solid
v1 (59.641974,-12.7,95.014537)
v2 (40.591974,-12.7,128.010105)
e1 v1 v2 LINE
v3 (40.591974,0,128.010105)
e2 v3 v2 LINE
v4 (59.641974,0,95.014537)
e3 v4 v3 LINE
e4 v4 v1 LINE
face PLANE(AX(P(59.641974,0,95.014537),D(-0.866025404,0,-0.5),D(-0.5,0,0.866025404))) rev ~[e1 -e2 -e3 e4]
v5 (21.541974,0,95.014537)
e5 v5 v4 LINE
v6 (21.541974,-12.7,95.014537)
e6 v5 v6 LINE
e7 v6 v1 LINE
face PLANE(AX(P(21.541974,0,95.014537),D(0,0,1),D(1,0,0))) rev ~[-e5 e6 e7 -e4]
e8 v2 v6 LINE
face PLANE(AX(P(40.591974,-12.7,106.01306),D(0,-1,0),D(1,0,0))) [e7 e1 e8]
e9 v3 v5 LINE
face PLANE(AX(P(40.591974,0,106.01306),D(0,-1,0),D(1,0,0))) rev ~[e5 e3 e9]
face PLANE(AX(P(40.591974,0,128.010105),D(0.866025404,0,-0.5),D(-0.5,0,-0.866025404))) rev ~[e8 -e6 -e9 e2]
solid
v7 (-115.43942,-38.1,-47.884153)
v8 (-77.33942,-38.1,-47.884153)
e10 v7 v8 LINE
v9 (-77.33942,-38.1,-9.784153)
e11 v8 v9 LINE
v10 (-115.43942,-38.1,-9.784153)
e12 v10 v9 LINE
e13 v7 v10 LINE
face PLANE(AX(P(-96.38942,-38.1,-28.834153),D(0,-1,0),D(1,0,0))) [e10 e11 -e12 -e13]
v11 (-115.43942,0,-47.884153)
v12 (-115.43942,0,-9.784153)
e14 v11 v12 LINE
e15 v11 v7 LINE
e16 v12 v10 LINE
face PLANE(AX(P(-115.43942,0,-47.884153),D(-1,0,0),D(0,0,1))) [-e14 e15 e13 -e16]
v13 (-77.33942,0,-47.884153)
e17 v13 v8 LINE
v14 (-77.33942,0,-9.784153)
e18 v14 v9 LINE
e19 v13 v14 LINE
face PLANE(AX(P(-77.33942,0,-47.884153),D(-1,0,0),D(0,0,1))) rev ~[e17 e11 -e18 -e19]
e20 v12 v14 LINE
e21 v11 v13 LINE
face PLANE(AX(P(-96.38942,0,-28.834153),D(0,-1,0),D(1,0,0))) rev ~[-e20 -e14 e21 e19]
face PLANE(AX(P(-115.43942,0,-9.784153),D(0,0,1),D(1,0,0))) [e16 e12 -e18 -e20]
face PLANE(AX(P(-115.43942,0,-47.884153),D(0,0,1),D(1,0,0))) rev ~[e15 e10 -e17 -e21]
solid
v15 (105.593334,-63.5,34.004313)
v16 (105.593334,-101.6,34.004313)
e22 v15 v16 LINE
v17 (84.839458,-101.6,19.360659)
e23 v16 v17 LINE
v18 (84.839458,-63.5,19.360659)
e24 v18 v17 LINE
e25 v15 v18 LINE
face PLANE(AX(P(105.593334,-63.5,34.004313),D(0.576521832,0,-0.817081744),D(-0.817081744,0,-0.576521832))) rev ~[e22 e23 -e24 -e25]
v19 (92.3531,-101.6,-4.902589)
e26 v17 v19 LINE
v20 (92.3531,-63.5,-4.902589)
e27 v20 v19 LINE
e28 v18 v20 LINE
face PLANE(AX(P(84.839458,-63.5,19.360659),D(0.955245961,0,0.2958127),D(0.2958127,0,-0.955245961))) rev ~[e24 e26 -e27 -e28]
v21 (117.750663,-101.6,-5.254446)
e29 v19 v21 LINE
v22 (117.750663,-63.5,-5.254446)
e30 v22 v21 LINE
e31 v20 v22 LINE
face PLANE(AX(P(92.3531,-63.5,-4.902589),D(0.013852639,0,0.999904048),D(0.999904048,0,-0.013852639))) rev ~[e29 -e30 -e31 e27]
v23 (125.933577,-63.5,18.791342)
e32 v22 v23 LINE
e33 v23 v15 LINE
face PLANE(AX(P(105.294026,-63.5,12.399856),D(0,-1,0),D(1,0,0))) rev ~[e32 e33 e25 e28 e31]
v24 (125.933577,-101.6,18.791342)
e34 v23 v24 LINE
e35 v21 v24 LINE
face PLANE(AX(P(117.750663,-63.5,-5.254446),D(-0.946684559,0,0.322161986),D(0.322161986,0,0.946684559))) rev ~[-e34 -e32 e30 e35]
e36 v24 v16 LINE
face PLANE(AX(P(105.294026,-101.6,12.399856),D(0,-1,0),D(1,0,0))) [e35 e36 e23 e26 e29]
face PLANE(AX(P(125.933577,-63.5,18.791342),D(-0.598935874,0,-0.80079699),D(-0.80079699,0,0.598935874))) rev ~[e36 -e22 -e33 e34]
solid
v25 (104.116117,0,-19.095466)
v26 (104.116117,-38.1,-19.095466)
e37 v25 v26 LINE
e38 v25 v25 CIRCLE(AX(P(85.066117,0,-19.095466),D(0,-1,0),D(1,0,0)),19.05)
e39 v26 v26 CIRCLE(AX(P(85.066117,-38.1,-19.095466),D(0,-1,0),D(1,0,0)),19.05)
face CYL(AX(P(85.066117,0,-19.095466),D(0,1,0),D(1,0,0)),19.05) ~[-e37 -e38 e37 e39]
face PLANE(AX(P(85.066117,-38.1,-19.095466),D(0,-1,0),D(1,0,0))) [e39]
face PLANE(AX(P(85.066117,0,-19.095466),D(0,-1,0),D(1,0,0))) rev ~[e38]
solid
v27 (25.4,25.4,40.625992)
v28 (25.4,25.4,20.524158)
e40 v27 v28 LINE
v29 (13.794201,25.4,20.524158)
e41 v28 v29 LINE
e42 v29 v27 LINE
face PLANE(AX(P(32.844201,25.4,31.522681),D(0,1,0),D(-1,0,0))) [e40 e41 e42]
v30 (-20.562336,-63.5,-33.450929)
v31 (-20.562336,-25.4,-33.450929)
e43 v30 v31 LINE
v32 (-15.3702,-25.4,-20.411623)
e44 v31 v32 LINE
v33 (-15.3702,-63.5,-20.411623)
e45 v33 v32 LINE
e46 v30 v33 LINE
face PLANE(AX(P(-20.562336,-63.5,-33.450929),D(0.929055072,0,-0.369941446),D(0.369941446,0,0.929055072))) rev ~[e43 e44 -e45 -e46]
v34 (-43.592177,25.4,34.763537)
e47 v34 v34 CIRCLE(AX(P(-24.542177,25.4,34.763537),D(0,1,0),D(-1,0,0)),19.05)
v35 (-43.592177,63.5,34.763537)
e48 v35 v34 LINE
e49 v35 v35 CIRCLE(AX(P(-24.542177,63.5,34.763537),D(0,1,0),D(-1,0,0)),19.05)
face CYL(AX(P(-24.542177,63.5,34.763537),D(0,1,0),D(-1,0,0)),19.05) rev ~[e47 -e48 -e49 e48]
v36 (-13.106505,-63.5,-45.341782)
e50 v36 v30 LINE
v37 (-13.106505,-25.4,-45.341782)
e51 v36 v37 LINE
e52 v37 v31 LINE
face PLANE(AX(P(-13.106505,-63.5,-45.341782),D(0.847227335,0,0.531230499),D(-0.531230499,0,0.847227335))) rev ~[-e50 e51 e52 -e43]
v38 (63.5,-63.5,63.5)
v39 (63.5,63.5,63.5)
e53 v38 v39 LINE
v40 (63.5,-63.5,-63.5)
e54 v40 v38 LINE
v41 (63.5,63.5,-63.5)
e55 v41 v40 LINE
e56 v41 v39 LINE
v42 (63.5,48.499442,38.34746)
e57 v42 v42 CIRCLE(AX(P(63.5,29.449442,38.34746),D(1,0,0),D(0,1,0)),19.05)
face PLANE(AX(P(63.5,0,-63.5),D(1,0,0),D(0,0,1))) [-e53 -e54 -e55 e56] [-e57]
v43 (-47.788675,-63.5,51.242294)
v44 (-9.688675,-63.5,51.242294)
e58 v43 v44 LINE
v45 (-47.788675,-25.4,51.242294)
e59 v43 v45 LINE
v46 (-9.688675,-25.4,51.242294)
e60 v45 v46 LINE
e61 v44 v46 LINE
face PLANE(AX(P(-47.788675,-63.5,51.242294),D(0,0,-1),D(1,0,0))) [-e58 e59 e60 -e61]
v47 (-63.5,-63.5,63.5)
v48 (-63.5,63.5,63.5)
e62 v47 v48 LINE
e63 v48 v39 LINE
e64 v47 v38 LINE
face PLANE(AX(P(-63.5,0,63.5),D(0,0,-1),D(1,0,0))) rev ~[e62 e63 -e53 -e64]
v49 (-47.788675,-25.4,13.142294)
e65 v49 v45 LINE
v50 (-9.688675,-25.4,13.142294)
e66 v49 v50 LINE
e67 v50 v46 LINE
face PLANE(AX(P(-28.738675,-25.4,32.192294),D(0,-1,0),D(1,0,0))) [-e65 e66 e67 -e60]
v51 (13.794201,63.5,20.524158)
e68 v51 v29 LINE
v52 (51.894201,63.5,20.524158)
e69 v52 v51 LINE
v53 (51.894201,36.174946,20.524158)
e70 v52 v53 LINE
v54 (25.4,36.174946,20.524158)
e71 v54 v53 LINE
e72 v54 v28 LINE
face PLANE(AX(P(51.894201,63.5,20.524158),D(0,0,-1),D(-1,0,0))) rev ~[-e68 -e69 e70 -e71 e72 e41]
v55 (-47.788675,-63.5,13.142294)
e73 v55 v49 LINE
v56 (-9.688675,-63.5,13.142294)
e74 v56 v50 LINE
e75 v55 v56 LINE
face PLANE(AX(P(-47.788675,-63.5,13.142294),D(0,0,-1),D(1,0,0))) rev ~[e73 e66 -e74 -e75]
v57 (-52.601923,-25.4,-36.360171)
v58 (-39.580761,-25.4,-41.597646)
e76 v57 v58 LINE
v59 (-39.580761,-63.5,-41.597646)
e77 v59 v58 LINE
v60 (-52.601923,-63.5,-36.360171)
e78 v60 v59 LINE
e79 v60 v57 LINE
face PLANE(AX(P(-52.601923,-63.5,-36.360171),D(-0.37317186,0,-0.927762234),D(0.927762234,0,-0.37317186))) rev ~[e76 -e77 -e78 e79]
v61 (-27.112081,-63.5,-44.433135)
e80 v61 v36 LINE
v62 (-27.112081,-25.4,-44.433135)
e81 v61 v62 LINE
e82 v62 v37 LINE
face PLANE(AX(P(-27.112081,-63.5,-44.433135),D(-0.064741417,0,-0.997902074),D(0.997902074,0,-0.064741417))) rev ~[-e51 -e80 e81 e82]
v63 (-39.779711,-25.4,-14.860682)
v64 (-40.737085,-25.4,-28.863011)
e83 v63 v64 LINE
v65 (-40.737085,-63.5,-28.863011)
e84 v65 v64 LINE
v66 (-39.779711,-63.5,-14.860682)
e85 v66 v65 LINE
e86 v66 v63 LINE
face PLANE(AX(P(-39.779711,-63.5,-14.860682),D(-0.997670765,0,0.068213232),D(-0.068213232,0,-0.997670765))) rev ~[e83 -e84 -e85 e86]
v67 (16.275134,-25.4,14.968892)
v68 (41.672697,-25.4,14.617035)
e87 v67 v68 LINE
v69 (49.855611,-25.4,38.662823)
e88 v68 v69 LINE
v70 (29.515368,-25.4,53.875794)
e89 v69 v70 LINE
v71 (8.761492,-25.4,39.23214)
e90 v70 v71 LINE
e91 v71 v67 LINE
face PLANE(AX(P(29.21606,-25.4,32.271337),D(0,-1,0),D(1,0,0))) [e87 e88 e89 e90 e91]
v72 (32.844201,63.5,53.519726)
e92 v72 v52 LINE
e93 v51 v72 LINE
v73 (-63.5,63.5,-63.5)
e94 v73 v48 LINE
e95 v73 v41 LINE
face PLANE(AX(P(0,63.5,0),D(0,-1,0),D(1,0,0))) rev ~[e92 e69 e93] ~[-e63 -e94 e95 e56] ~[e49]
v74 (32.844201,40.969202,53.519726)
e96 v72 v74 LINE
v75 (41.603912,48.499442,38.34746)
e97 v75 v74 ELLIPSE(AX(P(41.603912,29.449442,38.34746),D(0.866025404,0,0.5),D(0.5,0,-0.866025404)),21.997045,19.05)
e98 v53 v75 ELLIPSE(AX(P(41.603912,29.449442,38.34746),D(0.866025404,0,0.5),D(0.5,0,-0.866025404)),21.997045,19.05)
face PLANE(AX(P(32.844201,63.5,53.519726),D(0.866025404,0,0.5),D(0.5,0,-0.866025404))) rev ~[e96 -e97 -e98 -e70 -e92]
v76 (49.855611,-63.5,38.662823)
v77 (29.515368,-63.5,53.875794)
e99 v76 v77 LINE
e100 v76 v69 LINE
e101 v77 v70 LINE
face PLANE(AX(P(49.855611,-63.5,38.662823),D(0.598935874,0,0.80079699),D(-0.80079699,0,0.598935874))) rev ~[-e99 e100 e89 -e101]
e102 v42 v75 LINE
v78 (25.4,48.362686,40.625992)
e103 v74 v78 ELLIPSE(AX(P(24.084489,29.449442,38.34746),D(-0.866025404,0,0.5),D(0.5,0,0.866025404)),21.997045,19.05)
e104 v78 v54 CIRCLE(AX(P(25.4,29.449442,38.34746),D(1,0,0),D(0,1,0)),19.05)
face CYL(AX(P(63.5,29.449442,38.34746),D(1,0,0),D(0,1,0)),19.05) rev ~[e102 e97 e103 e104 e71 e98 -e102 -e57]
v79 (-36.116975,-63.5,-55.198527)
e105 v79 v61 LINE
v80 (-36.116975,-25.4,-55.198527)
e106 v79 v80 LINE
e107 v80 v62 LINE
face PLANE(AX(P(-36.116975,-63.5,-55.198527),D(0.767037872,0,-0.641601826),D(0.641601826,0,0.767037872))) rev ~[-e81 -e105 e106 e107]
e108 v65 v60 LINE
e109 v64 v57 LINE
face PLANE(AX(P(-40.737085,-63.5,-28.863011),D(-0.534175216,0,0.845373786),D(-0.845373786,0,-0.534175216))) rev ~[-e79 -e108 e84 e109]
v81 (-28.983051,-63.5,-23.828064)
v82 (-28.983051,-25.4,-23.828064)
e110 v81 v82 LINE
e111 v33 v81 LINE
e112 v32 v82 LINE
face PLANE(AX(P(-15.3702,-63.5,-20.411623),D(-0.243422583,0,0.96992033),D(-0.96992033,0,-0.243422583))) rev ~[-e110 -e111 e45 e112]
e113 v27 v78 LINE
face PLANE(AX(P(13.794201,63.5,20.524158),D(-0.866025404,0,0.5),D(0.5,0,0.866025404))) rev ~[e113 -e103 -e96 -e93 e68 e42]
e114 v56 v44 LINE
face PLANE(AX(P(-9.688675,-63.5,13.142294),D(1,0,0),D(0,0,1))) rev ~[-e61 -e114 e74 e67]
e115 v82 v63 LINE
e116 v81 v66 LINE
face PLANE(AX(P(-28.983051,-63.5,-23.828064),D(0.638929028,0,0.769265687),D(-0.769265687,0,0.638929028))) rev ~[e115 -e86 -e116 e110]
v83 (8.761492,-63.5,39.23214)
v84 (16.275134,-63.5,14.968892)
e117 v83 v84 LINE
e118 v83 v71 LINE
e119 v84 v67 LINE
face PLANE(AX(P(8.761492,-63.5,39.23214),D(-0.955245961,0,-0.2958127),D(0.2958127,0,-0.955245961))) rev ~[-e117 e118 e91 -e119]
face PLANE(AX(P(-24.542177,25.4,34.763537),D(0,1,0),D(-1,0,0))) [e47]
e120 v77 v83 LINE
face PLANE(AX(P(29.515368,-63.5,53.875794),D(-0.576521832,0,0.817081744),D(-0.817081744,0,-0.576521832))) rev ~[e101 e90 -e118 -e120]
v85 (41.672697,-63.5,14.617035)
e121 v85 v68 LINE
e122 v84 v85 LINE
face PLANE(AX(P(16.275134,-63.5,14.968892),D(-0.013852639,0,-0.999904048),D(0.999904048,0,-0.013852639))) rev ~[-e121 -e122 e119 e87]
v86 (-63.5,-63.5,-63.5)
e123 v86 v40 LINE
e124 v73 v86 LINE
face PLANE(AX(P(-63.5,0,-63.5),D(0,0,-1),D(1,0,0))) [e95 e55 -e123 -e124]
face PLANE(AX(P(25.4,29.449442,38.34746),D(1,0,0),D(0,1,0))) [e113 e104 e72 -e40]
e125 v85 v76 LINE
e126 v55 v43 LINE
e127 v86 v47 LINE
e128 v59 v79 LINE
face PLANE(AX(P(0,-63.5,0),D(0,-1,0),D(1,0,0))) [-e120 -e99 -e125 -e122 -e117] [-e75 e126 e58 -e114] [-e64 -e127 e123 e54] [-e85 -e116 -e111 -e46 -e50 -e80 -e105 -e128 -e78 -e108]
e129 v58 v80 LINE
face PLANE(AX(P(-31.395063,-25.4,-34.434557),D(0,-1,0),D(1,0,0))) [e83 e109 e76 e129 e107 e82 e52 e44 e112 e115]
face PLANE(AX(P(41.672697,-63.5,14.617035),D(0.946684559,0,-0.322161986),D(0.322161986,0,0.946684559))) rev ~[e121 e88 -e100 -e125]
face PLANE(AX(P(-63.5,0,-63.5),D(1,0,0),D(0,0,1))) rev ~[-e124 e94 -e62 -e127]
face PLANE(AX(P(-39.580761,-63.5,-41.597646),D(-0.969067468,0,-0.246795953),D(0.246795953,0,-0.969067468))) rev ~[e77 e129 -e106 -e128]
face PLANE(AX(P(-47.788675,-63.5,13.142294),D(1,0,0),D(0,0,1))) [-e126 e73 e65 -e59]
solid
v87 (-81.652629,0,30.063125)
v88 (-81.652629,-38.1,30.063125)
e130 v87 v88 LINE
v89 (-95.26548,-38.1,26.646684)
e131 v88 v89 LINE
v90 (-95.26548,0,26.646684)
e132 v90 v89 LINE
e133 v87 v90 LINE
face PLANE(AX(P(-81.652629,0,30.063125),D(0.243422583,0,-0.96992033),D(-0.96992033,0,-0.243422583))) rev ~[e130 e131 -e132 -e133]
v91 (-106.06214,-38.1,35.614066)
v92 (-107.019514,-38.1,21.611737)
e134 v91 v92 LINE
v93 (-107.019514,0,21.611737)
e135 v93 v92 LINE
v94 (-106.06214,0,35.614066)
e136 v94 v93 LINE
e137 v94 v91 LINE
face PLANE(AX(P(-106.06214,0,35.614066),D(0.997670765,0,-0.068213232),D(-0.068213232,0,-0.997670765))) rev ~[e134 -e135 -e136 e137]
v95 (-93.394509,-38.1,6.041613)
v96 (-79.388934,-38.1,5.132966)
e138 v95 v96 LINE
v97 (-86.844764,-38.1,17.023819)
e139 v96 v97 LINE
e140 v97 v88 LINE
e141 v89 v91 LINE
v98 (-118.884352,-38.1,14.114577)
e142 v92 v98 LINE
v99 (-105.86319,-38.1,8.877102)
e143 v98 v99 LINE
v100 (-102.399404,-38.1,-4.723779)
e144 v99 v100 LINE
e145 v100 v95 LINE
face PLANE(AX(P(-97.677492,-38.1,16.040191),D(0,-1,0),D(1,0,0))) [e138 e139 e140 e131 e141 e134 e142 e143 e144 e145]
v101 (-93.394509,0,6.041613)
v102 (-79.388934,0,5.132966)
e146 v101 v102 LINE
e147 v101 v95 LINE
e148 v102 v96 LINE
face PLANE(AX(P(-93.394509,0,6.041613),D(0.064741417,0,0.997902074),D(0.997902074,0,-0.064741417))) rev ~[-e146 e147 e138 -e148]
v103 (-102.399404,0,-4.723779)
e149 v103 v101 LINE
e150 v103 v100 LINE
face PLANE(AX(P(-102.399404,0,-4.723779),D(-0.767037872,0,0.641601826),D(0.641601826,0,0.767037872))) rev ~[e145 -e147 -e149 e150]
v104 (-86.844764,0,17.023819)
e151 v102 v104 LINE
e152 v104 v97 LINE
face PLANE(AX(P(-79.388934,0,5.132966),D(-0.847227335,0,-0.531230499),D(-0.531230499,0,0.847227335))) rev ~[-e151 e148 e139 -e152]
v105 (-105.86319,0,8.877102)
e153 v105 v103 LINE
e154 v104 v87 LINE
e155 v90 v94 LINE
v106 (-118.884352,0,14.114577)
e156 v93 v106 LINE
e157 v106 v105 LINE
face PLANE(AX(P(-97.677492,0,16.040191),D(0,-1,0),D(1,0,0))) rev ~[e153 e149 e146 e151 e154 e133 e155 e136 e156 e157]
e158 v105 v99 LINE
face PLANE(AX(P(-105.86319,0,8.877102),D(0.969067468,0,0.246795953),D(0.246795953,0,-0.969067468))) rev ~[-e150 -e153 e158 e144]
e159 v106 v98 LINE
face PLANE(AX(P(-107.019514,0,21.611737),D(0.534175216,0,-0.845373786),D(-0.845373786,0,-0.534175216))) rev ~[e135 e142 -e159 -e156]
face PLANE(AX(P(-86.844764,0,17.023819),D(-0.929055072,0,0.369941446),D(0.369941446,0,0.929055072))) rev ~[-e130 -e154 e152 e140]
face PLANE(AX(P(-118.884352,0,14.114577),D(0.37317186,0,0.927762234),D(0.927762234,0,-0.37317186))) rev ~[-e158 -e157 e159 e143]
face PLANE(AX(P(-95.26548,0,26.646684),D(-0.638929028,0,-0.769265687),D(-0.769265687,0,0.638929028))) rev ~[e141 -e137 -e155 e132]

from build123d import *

# Parameters (mm, degrees)
F0_W      = 127
F0_H      = 127
F1_DEPTH  = 63.5
F2_W      = 38.1
F2_H      = 38.1
F3_DEPTH  = 38.1
F5_DEPTH  = 38.1
F7_DEPTH  = 38.1
F8_R      = 19.05
F9_DEPTH  = 38.1
F11_DEPTH = 38.1
F12_R     = 19.05
F13_DEPTH = 38.1
F15_DEPTH = 38.1
F16_W     = 38.1
F16_H     = 38.1
F17_DEPTH = 38.1
F18_R     = 19.05
F19_DEPTH = 38.1
F21_DEPTH = 38.1
F24_DEPTH = 12.7


# Not quite as in the source:
# - the program builds the solid bodies; features that only make, move or delete a surface that nothing else refers to are left out


with BuildPart() as f1:
    # F0 (on Front) → F1 (new body, symmetric)
    with BuildSketch(Plane.XZ):
        Rectangle(F0_W, F0_H)
    extrude(amount=F1_DEPTH, both=True)

    # F2 (on face) → F3 (cut)
    with BuildSketch(Plane.XZ.offset(63.5)):
        with Locations((-28.7386754062, 32.1922943337)):
            Rectangle(F2_W, F2_H)
        with Locations((86.2550362945, -6.9399550557)):
            Rectangle(F2_W, F2_H)
    extrude(amount=-F3_DEPTH, mode=Mode.SUBTRACT)

    # F4 (on face) → F5 (cut)
    with BuildSketch(Plane.XZ.offset(63.5)):
        Polygon((8.7614915837, 39.2321395601), (16.2751341757, 14.9688921476), (41.6726969844, 14.6170351066), (49.8556114396, 38.6628229086), (29.5153678912, 53.8757940975), align=None)
    extrude(amount=-F5_DEPTH, mode=Mode.SUBTRACT)

    # F6 (on face) → F7 (cut)
    with BuildSketch(Plane(origin=(0, 63.5, 0), x_dir=(-1, 0, 0), z_dir=(0, 1, 0))):
        Polygon((-51.8942007303, 20.5241581157), (-13.7942007303, 20.5241581157), (-32.8442007303, 53.5197259999), align=None)
    extrude(amount=-F7_DEPTH, mode=Mode.SUBTRACT)

    # F8 (on face) → F9 (cut)
    with BuildSketch(Plane(origin=(0, 63.5, 0), x_dir=(-1, 0, 0), z_dir=(0, 1, 0))):
        with Locations((24.542177096, 34.7635373473)):
            Circle(F8_R)
    extrude(amount=-F9_DEPTH, mode=Mode.SUBTRACT)

    # F10 (on face) → F11 (cut)
    with BuildSketch(Plane.XZ.offset(63.5)):
        Polygon((-39.7797108135, -14.8606818497), (-40.7370848933, -28.8630111208), (-52.6019230047, -36.3601710319), (-39.5807613688, -41.5976455947), (-36.1169751935, -55.1985270174), (-27.1120806497, -44.4331350413), (-13.1065049523, -45.3417821264), (-20.5623356949, -33.4509294202), (-15.3702000572, -20.4116227799), (-28.9830514143, -23.8280636283), align=None)
    extrude(amount=-F11_DEPTH, mode=Mode.SUBTRACT)

    # F12 (on face) → F13 (cut)
    with BuildSketch(Plane.YZ.offset(63.5)):
        with Locations((29.4494424015, 38.3474603295)):
            Circle(F12_R)
    extrude(amount=-F13_DEPTH, mode=Mode.SUBTRACT)


with BuildPart() as f15:
    # F14 (on face) → F15 (new body)
    with BuildSketch(Plane.XZ.offset(63.5)):
        Polygon((84.8394576032, 19.3606587971), (92.3531001952, -4.9025886154), (117.7506630039, -5.2544456563), (125.9335774591, 18.7913421457), (105.5933339107, 34.0043133345), align=None)
    extrude(amount=F15_DEPTH)


with BuildPart() as f17:
    # F16 (on Front) → F17 (new body)
    with BuildSketch(Plane.XZ):
        with Locations((-96.3894203305, -28.8341529667)):
            Rectangle(F16_W, F16_H)
    extrude(amount=F17_DEPTH)


with BuildPart() as f19:
    # F18 (on Front) → F19 (new body)
    with BuildSketch(Plane.XZ):
        with Locations((85.0661173463, -19.0954655409)):
            Circle(F18_R)
    extrude(amount=F19_DEPTH)


with BuildPart() as f21:
    # F20 (on Front) → F21 (new body)
    with BuildSketch(Plane.XZ):
        Polygon((-106.0621396145, 35.6140661657), (-107.0195136944, 21.6117368946), (-118.8843518057, 14.1145769835), (-105.8631901699, 8.8771024207), (-102.3994039946, -4.723779002), (-93.3945094508, 6.0416129741), (-79.3889337533, 5.132965889), (-86.844764496, 17.0238185952), (-81.6526288582, 30.0631252355), (-95.2654802154, 26.6466843871), align=None)
    extrude(amount=F21_DEPTH)


with BuildPart() as f24:
    # F22 (on Front) → F24 (new body)
    with BuildSketch(Plane.XZ):
        Polygon((21.5419738114, 95.014536988), (59.6419738114, 95.014536988), (40.5919738114, 128.0101048722), align=None)
    extrude(amount=F24_DEPTH)


solid = Compound([f1.part, f15.part, f17.part, f19.part, f21.part, f24.part])
